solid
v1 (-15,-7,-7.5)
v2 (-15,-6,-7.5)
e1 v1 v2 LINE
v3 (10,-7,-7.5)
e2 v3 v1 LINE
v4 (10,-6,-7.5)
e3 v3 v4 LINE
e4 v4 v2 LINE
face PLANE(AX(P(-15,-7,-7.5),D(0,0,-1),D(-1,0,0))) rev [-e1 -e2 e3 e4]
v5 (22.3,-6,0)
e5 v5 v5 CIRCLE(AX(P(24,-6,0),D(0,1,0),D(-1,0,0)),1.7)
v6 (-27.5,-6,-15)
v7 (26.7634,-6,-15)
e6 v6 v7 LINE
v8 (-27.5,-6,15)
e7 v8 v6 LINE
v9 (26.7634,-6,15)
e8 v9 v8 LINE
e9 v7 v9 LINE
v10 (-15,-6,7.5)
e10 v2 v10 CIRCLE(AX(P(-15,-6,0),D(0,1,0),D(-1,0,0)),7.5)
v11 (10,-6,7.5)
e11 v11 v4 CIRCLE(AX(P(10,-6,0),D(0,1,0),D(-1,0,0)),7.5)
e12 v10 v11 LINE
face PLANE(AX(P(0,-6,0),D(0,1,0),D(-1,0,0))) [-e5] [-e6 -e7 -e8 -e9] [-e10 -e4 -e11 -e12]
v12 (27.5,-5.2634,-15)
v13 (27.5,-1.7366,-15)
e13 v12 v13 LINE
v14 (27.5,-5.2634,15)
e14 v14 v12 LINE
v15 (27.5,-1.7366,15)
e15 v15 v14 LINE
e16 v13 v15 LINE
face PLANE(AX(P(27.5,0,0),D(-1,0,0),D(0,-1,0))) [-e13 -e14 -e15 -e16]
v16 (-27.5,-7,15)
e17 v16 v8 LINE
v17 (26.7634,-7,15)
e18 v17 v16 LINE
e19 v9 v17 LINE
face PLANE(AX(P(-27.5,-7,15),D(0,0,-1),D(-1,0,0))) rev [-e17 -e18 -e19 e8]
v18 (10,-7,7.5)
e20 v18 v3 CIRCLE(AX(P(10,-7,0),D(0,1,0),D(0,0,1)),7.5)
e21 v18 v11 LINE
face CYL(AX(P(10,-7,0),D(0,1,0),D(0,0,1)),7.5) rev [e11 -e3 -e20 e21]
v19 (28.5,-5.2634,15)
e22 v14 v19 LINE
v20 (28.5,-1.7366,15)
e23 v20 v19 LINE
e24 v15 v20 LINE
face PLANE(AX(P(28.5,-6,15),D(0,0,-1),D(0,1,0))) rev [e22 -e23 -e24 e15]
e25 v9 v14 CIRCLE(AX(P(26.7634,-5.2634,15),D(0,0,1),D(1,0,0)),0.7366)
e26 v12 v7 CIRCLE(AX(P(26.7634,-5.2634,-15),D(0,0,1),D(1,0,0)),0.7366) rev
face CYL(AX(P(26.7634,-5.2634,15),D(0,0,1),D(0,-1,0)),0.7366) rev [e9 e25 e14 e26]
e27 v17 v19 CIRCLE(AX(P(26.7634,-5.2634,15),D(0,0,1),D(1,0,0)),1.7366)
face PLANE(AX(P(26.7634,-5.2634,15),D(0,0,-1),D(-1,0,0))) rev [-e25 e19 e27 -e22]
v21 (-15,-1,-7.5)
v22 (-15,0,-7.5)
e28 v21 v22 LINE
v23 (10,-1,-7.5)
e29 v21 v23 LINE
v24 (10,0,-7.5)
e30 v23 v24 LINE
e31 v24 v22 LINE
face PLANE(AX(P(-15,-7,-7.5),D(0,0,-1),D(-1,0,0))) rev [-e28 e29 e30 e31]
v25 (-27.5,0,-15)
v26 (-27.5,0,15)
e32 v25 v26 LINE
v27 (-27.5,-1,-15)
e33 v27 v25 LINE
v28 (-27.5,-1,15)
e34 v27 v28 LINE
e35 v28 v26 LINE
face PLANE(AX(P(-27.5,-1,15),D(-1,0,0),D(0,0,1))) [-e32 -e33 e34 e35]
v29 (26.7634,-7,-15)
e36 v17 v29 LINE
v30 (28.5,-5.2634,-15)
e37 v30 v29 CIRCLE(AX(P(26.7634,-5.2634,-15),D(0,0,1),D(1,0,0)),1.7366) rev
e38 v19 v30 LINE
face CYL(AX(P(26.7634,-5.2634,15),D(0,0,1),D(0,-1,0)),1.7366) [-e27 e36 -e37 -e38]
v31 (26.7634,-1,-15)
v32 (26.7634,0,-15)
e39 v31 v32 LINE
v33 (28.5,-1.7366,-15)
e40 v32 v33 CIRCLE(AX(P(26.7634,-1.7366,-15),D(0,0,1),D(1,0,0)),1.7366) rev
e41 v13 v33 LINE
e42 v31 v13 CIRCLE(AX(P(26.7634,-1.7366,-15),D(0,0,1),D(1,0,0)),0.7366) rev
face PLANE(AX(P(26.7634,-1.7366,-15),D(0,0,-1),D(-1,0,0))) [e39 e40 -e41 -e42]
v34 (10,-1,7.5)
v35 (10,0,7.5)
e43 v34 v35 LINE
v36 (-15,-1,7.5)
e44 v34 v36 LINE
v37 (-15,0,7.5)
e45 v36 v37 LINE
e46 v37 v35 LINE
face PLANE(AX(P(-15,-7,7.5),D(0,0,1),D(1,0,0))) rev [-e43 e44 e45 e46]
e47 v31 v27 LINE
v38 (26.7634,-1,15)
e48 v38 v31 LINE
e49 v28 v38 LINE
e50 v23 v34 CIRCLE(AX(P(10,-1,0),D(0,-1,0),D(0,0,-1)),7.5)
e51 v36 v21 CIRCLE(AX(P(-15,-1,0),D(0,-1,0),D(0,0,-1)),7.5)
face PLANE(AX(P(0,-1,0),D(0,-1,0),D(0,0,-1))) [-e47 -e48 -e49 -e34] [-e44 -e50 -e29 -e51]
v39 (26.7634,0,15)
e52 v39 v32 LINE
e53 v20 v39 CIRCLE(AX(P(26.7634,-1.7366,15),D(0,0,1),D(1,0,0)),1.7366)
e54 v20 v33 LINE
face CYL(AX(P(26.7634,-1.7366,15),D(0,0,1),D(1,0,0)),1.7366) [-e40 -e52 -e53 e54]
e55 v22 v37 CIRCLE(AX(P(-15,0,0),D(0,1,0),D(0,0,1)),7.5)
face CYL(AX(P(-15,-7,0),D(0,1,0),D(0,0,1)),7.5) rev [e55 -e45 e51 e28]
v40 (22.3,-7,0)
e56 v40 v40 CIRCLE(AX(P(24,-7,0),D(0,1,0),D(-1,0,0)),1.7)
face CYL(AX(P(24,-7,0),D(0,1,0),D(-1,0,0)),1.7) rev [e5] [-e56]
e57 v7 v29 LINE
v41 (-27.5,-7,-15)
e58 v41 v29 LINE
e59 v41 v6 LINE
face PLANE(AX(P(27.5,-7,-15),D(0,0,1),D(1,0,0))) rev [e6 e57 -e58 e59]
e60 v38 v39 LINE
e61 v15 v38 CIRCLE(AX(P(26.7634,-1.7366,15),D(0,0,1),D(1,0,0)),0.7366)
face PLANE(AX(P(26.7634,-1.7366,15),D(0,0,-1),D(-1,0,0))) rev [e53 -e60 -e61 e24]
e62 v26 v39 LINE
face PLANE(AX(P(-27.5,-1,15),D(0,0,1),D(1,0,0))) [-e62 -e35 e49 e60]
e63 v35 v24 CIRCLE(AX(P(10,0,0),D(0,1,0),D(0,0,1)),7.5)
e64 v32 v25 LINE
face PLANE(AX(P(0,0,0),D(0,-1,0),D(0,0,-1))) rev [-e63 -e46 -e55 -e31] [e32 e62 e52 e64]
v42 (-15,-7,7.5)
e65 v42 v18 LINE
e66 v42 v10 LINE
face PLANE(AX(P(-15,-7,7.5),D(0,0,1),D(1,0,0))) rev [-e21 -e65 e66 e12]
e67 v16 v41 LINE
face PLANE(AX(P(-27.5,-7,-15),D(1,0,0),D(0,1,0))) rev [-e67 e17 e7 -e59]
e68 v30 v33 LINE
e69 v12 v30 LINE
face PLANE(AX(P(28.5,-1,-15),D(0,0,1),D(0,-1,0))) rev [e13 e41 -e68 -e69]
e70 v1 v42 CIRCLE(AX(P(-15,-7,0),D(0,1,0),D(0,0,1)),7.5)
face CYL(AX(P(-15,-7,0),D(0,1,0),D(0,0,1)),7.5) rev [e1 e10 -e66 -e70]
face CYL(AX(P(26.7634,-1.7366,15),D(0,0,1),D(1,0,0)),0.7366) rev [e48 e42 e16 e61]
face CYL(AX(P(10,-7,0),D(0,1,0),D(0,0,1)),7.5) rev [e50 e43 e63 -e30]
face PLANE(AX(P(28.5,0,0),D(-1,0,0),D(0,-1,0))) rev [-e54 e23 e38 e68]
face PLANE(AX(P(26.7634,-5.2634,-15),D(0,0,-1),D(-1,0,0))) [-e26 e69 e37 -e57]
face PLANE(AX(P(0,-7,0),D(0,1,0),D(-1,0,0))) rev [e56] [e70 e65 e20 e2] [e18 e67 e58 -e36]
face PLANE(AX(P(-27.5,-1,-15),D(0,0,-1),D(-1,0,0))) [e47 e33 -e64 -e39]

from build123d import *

# Parameters (mm, degrees)
ESQUISSE2_W                           = 55
ESQUISSE2_H                           = 30
T_LE_DE_BASE_PLI_E1_DEPTH             = 1
T_LE_PLI_E_SUR_AR_TE1_STRIP_W         = 5.4732
T_LE_PLI_E_SUR_AR_TE1_STRIP_H         = 1
T_LE_PLI_E_SUR_AR_TE1_STRIP_CUT_DEPTH = 30
T_LE_PLI_E_SUR_AR_TE1_DEPTH           = 30
T_LE_PLI_E_SUR_AR_TE2_STRIP_W         = 5.4732
T_LE_PLI_E_SUR_AR_TE2_STRIP_H         = 1
T_LE_PLI_E_SUR_AR_TE2_STRIP_CUT_DEPTH = 30
T_LE_PLI_E_SUR_AR_TE2_DEPTH           = 30
ENL_V_MAT_EXTRU_1_DEPTH               = 33.958306995
ESQUISSE29_R                          = 1.7
ENL_V_MAT_EXTRU_3_DEPTH               = 33.760494502


# Sheet-metal steps are written as plain solids
with BuildPart() as part:
    # Esquisse2 → Tôle de base pliée1 (new body)
    with BuildSketch(Plane(origin=(0, 0, 0), x_dir=(1, 0, 0), z_dir=(0, 1, 0))):
        Rectangle(ESQUISSE2_W, ESQUISSE2_H)
    extrude(amount=-T_LE_DE_BASE_PLI_E1_DEPTH)

    # Tôle pliée sur arête1 strip (across the edge) → Tôle pliée sur arête1 strip cut (cut)
    with BuildSketch(Plane(origin=(27.5, -1, -15), x_dir=(-1, 0, 0), z_dir=(0, 0, 1))):
        with Locations((-2, -0.5)):
            Rectangle(T_LE_PLI_E_SUR_AR_TE1_STRIP_W, T_LE_PLI_E_SUR_AR_TE1_STRIP_H)
    extrude(amount=T_LE_PLI_E_SUR_AR_TE1_STRIP_CUT_DEPTH, mode=Mode.SUBTRACT)

    # Tôle pliée sur arête1 section (across the edge) → Tôle pliée sur arête1 (add)
    with BuildSketch(Plane(origin=(27.5, -1, -15), x_dir=(-1, 0, 0), z_dir=(0, 0, 1))):
        with BuildLine():
            Line((-1, 0.7366), (-1, 5))
            Line((-1, 5), (0, 5))
            Line((0, 5), (0, 0.7366))
            ThreePointArc((0, 0.7366), (0.215745145, 0.215745145), (0.7366, 0))
            Line((0.7366, 0), (0.7366, -1))
            ThreePointArc((0.7366, -1), (-0.491361636, -0.491361636), (-1, 0.7366))
        make_face()
    extrude(amount=T_LE_PLI_E_SUR_AR_TE1_DEPTH)

    # Tôle pliée sur arête2 strip (across the edge) → Tôle pliée sur arête2 strip cut (cut)
    with BuildSketch(Plane(origin=(27.5, -6, -15), x_dir=(0, 1, 0), z_dir=(0, 0, 1))):
        with Locations((-2, -0.5)):
            Rectangle(T_LE_PLI_E_SUR_AR_TE2_STRIP_W, T_LE_PLI_E_SUR_AR_TE2_STRIP_H)
    extrude(amount=T_LE_PLI_E_SUR_AR_TE2_STRIP_CUT_DEPTH, mode=Mode.SUBTRACT)

    # Tôle pliée sur arête2 section (across the edge) → Tôle pliée sur arête2 (add)
    with BuildSketch(Plane(origin=(27.5, -6, -15), x_dir=(0, 1, 0), z_dir=(0, 0, 1))):
        with BuildLine():
            Line((-1, 0.7366), (-1, 55))
            Line((-1, 55), (0, 55))
            Line((0, 55), (0, 0.7366))
            ThreePointArc((0, 0.7366), (0.215745145, 0.215745145), (0.7366, 0))
            Line((0.7366, 0), (0.7366, -1))
            ThreePointArc((0.7366, -1), (-0.491361636, -0.491361636), (-1, 0.7366))
        make_face()
    extrude(amount=T_LE_PLI_E_SUR_AR_TE2_DEPTH)

    # Esquisse26 → Enlèv. mat.-Extru.1 (cut, through all)
    with BuildSketch(Plane(origin=(0, 0, 0), x_dir=(1, 0, 0), z_dir=(0, 1, 0))):
        with BuildLine():
            Line((-15, 7.5), (10, 7.5))
            ThreePointArc((10, 7.5), (17.5, 0), (10, -7.5))
            Line((10, -7.5), (-15, -7.5))
            ThreePointArc((-15, -7.5), (-22.5, 0), (-15, 7.5))
        make_face()
    extrude(amount=-ENL_V_MAT_EXTRU_1_DEPTH, mode=Mode.SUBTRACT)

    # Esquisse29 → Enlèv. mat.-Extru.3 (cut, through all)
    with BuildSketch(Plane(origin=(0, -6, 0), x_dir=(1, 0, 0), z_dir=(0, 1, 0))):
        with Locations(Location((24, 0, 0), (0, 0, 180))):
            Circle(ESQUISSE29_R)
    extrude(amount=-ENL_V_MAT_EXTRU_3_DEPTH, mode=Mode.SUBTRACT)


solid = part.part
